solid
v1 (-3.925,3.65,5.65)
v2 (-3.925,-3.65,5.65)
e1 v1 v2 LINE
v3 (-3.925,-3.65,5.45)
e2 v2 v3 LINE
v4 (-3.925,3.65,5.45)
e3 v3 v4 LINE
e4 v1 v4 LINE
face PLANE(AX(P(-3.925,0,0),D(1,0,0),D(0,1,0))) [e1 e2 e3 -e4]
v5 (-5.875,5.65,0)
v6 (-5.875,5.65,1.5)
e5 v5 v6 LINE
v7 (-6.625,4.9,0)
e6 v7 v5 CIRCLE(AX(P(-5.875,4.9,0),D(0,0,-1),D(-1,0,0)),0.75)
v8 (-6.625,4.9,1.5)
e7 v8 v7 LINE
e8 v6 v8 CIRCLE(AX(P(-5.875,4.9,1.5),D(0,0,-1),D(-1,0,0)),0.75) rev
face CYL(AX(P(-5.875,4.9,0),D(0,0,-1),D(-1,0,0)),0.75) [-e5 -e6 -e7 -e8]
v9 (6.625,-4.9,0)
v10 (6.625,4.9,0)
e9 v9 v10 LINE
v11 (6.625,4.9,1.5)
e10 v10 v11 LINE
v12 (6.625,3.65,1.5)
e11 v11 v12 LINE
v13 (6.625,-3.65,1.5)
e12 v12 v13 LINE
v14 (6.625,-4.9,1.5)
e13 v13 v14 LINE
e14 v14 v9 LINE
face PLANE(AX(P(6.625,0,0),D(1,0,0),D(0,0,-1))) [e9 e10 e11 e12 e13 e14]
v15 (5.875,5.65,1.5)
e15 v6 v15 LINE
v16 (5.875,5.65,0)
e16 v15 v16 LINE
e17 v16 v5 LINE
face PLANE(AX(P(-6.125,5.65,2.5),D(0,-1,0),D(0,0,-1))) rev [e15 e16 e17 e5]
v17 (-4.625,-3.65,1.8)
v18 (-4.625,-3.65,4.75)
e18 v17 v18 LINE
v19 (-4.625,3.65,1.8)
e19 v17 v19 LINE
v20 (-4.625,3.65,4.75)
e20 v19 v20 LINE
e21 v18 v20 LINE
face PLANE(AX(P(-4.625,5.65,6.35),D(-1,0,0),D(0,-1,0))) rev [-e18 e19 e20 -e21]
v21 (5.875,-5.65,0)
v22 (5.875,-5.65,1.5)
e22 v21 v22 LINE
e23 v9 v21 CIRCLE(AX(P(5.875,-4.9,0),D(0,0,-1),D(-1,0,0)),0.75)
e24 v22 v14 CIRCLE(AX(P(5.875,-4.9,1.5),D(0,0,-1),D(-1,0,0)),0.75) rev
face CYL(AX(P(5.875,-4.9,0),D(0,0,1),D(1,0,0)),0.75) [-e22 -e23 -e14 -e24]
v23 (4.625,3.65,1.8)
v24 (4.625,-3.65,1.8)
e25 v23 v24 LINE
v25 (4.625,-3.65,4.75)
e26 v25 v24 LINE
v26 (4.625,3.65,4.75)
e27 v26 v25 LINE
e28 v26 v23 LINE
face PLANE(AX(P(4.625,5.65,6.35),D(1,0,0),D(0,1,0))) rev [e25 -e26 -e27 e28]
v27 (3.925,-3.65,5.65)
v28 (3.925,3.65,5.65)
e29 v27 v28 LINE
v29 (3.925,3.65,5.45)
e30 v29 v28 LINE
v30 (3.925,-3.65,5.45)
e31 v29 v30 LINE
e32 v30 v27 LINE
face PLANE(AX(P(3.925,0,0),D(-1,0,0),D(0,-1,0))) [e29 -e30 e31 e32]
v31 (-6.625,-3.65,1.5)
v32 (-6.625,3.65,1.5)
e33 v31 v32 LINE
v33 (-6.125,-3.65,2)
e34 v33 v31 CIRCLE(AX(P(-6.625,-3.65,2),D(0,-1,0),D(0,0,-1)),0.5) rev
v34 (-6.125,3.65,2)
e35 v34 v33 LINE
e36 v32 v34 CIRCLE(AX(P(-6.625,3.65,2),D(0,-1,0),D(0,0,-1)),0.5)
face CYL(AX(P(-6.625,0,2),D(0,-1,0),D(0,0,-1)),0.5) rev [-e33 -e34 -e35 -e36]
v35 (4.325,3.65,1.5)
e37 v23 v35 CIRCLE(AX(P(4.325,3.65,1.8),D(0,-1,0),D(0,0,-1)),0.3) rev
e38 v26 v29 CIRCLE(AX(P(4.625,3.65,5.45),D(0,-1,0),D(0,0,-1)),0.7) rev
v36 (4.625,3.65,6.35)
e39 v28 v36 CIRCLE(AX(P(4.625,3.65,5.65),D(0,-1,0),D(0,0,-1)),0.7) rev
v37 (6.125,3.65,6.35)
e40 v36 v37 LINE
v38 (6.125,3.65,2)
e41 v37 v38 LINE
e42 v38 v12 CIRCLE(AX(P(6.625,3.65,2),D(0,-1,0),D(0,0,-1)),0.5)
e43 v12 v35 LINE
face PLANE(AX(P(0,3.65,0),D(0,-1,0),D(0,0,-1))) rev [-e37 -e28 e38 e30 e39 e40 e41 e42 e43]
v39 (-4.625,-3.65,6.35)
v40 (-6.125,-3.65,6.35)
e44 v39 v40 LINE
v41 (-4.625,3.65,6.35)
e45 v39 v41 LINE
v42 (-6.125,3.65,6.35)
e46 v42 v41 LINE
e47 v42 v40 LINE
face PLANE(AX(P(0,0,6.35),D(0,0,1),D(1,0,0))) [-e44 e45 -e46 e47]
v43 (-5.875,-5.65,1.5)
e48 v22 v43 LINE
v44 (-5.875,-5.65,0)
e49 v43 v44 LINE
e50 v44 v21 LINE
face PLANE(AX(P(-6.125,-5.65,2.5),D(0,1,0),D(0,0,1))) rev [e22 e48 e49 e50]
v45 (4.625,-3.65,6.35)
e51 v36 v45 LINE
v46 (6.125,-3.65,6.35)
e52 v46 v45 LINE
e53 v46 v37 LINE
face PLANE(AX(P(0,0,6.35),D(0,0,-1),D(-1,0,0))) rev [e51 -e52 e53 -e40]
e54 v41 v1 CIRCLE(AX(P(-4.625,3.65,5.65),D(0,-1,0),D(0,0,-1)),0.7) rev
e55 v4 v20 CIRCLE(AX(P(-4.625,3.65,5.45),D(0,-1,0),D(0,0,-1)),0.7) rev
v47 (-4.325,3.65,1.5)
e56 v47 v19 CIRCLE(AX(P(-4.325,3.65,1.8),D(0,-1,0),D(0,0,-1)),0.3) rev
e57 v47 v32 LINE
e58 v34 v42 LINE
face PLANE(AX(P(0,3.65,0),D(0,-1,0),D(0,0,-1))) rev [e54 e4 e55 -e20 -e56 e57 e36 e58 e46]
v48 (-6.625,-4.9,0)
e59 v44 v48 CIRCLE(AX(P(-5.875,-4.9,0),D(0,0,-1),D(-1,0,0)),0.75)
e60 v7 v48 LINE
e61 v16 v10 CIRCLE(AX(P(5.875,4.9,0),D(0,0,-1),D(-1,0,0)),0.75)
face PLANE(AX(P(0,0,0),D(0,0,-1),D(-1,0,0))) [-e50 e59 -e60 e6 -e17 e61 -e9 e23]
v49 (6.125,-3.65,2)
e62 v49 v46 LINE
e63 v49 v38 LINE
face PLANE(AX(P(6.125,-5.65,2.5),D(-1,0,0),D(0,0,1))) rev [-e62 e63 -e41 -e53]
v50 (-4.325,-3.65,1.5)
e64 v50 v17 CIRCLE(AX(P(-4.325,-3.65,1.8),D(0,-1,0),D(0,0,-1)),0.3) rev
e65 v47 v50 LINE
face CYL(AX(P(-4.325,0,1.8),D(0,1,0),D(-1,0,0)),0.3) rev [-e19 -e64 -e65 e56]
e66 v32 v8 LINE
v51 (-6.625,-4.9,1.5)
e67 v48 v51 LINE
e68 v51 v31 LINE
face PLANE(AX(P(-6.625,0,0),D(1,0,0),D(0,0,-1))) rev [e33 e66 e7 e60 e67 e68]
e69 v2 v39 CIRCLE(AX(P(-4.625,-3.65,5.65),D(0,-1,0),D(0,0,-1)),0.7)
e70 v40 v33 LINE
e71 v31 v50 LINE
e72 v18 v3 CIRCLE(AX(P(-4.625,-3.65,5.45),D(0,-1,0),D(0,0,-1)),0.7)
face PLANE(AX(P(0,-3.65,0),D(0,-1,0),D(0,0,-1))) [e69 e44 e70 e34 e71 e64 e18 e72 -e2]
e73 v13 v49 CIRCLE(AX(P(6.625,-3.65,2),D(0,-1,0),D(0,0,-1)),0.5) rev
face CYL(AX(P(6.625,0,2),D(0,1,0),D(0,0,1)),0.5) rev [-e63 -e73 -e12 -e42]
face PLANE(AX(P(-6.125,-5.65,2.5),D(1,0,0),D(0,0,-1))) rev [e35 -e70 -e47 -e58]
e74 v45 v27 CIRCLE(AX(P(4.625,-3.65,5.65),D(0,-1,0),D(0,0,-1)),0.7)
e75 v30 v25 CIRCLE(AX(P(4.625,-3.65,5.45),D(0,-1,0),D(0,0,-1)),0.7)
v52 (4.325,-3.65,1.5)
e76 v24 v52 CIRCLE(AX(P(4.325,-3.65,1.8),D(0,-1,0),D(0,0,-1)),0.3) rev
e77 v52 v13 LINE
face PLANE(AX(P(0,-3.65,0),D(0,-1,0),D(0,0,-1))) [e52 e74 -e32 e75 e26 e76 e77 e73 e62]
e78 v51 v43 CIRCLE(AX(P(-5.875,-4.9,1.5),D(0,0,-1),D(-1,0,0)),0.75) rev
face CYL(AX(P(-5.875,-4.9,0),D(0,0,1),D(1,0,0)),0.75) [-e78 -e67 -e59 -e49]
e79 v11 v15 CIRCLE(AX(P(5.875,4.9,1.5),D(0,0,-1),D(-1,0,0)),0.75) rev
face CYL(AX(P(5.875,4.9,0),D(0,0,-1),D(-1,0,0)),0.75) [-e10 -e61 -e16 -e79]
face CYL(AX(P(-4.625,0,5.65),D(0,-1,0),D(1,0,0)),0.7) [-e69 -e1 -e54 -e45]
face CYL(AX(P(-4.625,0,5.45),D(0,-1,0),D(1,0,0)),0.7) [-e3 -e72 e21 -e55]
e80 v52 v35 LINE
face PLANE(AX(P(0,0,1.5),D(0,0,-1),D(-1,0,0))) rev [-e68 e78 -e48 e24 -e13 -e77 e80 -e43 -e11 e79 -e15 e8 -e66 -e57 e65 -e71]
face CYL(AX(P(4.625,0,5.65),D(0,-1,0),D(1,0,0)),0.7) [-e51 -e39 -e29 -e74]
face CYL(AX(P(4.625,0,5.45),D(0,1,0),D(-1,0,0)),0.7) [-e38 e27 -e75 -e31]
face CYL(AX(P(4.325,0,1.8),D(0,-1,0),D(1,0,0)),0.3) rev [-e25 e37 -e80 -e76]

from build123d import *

# Parameters (mm, degrees)
SKETCH_1_W          = 12.25
SKETCH_1_H          = 11.3
EXTRUDE_1_DEPTH     = 2.5
SKETCH_2_W          = 1.5
SKETCH_2_H          = 11.3
EXTRUDE_2_DEPTH     = 3.85
SKETCH_5_W          = 9.25
SKETCH_5_H          = 11.5
CUT_EXTRUDE_1_DEPTH = 1
SKETCH_8_W          = 1.6
SKETCH_8_H          = 11.3
EXTRUDE_5_DEPTH     = 0.7
SKETCH_9_W          = 1.6
SKETCH_9_H          = 11.3
EXTRUDE_6_DEPTH     = 0.7
FILLET_8_R          = 0.3
SKETCH_11_W         = 12.25
SKETCH_11_H         = 4.85
CUT_EXTRUDE_2_DEPTH = 2
SKETCH_12_W         = 12.25
SKETCH_12_H         = 4.85
CUT_EXTRUDE_3_DEPTH = 2
SKETCH_13_W         = 1.5
SKETCH_13_H         = 11.3
EXTRUDE_7_DEPTH     = 0.5
SKETCH_14_W         = 1.5
SKETCH_14_H         = 11.3
EXTRUDE_8_DEPTH     = 0.5
FILLET_9_R          = 0.5
FILLET_10_R         = 0.7
FILLET_11_R         = 0.75


with BuildPart() as part:
    # 스케치1 → 보스-돌출1 (new body)
    with BuildSketch(Plane.XY):
        Rectangle(SKETCH_1_W, SKETCH_1_H)
    extrude(amount=EXTRUDE_1_DEPTH)

    # 스케치2 → 보스-돌출2 (add)
    with BuildSketch(Plane.XY.offset(2.5)):
        with Locations((-5.375, 0)):
            Rectangle(SKETCH_2_W, SKETCH_2_H)
        with Locations((5.375, 0)):
            Rectangle(SKETCH_2_W, SKETCH_2_H)
    extrude(amount=EXTRUDE_2_DEPTH)

    # 스케치5 → 컷-돌출1 (cut)
    with BuildSketch(Plane.XY.offset(2.5)):
        Rectangle(SKETCH_5_W, SKETCH_5_H)
    extrude(amount=-CUT_EXTRUDE_1_DEPTH, mode=Mode.SUBTRACT)

    # 스케치8 → 보스-돌출5 (add)
    with BuildSketch(Plane(origin=(-4.625, 0, 0), x_dir=(0, 0, -1), z_dir=(1, 0, 0))):
        with Locations((-5.55, 0)):
            Rectangle(SKETCH_8_W, SKETCH_8_H)
    extrude(amount=EXTRUDE_5_DEPTH)

    # 스케치9 → 보스-돌출6 (add)
    with BuildSketch(Plane.ZY.offset(-4.625)):
        with Locations((5.55, 0)):
            Rectangle(SKETCH_9_W, SKETCH_9_H)
    extrude(amount=EXTRUDE_6_DEPTH)

    # 필렛8
    fillet_8_edges = [part.edges().sort_by_distance(p)[0] for p in [
        (4.625, 0, 1.5),
        (-4.625, 0, 1.5),
    ]]
    fillet(fillet_8_edges, radius=FILLET_8_R)

    # 스케치11 → 컷-돌출2 (cut)
    with BuildSketch(Plane(origin=(0, 5.65, 0), x_dir=(1, 0, 0), z_dir=(0, 1, 0))):
        with Locations((0, -3.925)):
            Rectangle(SKETCH_11_W, SKETCH_11_H)
    extrude(amount=-CUT_EXTRUDE_2_DEPTH, mode=Mode.SUBTRACT)

    # 스케치12 → 컷-돌출3 (cut)
    with BuildSketch(Plane.XZ.offset(5.65)):
        with Locations((0, 3.925)):
            Rectangle(SKETCH_12_W, SKETCH_12_H)
    extrude(amount=-CUT_EXTRUDE_3_DEPTH, mode=Mode.SUBTRACT)

    # 스케치13 → 보스-돌출7 (add)
    with BuildSketch(Plane(origin=(6.125, 0, 0), x_dir=(0, 0, -1), z_dir=(1, 0, 0))):
        with Locations((-0.75, 0)):
            Rectangle(SKETCH_13_W, SKETCH_13_H)
    extrude(amount=EXTRUDE_7_DEPTH)

    # 스케치14 → 보스-돌출8 (add)
    with BuildSketch(Plane.ZY.offset(6.125)):
        with Locations((0.75, 0)):
            Rectangle(SKETCH_14_W, SKETCH_14_H)
    extrude(amount=EXTRUDE_8_DEPTH)

    # 필렛9
    fillet_9_edges = [part.edges().sort_by_distance(p)[0] for p in [
        (6.125, 0, 1.5),
        (-6.125, 0, 1.5),
    ]]
    fillet(fillet_9_edges, radius=FILLET_9_R - 0.0001)  # a hair under: the kernel refuses the full size

    # 필렛10
    fillet_10_edges = [part.edges().sort_by_distance(p)[0] for p in [
        (-3.925, 0, 6.35),
        (-3.925, 0, 4.75),
        (3.925, 0, 4.75),
        (3.925, 0, 6.35),
    ]]
    fillet(fillet_10_edges, radius=FILLET_10_R - 0.0001)  # a hair under: the kernel refuses the full size

    # 필렛11
    fillet_11_edges = [part.edges().sort_by_distance(p)[0] for p in [
        (6.625, -5.65, 0.75),
        (6.625, 5.65, 0.75),
        (-6.625, 5.65, 0.75),
        (-6.625, -5.65, 0.75),
    ]]
    fillet(fillet_11_edges, radius=FILLET_11_R)


solid = part.part
